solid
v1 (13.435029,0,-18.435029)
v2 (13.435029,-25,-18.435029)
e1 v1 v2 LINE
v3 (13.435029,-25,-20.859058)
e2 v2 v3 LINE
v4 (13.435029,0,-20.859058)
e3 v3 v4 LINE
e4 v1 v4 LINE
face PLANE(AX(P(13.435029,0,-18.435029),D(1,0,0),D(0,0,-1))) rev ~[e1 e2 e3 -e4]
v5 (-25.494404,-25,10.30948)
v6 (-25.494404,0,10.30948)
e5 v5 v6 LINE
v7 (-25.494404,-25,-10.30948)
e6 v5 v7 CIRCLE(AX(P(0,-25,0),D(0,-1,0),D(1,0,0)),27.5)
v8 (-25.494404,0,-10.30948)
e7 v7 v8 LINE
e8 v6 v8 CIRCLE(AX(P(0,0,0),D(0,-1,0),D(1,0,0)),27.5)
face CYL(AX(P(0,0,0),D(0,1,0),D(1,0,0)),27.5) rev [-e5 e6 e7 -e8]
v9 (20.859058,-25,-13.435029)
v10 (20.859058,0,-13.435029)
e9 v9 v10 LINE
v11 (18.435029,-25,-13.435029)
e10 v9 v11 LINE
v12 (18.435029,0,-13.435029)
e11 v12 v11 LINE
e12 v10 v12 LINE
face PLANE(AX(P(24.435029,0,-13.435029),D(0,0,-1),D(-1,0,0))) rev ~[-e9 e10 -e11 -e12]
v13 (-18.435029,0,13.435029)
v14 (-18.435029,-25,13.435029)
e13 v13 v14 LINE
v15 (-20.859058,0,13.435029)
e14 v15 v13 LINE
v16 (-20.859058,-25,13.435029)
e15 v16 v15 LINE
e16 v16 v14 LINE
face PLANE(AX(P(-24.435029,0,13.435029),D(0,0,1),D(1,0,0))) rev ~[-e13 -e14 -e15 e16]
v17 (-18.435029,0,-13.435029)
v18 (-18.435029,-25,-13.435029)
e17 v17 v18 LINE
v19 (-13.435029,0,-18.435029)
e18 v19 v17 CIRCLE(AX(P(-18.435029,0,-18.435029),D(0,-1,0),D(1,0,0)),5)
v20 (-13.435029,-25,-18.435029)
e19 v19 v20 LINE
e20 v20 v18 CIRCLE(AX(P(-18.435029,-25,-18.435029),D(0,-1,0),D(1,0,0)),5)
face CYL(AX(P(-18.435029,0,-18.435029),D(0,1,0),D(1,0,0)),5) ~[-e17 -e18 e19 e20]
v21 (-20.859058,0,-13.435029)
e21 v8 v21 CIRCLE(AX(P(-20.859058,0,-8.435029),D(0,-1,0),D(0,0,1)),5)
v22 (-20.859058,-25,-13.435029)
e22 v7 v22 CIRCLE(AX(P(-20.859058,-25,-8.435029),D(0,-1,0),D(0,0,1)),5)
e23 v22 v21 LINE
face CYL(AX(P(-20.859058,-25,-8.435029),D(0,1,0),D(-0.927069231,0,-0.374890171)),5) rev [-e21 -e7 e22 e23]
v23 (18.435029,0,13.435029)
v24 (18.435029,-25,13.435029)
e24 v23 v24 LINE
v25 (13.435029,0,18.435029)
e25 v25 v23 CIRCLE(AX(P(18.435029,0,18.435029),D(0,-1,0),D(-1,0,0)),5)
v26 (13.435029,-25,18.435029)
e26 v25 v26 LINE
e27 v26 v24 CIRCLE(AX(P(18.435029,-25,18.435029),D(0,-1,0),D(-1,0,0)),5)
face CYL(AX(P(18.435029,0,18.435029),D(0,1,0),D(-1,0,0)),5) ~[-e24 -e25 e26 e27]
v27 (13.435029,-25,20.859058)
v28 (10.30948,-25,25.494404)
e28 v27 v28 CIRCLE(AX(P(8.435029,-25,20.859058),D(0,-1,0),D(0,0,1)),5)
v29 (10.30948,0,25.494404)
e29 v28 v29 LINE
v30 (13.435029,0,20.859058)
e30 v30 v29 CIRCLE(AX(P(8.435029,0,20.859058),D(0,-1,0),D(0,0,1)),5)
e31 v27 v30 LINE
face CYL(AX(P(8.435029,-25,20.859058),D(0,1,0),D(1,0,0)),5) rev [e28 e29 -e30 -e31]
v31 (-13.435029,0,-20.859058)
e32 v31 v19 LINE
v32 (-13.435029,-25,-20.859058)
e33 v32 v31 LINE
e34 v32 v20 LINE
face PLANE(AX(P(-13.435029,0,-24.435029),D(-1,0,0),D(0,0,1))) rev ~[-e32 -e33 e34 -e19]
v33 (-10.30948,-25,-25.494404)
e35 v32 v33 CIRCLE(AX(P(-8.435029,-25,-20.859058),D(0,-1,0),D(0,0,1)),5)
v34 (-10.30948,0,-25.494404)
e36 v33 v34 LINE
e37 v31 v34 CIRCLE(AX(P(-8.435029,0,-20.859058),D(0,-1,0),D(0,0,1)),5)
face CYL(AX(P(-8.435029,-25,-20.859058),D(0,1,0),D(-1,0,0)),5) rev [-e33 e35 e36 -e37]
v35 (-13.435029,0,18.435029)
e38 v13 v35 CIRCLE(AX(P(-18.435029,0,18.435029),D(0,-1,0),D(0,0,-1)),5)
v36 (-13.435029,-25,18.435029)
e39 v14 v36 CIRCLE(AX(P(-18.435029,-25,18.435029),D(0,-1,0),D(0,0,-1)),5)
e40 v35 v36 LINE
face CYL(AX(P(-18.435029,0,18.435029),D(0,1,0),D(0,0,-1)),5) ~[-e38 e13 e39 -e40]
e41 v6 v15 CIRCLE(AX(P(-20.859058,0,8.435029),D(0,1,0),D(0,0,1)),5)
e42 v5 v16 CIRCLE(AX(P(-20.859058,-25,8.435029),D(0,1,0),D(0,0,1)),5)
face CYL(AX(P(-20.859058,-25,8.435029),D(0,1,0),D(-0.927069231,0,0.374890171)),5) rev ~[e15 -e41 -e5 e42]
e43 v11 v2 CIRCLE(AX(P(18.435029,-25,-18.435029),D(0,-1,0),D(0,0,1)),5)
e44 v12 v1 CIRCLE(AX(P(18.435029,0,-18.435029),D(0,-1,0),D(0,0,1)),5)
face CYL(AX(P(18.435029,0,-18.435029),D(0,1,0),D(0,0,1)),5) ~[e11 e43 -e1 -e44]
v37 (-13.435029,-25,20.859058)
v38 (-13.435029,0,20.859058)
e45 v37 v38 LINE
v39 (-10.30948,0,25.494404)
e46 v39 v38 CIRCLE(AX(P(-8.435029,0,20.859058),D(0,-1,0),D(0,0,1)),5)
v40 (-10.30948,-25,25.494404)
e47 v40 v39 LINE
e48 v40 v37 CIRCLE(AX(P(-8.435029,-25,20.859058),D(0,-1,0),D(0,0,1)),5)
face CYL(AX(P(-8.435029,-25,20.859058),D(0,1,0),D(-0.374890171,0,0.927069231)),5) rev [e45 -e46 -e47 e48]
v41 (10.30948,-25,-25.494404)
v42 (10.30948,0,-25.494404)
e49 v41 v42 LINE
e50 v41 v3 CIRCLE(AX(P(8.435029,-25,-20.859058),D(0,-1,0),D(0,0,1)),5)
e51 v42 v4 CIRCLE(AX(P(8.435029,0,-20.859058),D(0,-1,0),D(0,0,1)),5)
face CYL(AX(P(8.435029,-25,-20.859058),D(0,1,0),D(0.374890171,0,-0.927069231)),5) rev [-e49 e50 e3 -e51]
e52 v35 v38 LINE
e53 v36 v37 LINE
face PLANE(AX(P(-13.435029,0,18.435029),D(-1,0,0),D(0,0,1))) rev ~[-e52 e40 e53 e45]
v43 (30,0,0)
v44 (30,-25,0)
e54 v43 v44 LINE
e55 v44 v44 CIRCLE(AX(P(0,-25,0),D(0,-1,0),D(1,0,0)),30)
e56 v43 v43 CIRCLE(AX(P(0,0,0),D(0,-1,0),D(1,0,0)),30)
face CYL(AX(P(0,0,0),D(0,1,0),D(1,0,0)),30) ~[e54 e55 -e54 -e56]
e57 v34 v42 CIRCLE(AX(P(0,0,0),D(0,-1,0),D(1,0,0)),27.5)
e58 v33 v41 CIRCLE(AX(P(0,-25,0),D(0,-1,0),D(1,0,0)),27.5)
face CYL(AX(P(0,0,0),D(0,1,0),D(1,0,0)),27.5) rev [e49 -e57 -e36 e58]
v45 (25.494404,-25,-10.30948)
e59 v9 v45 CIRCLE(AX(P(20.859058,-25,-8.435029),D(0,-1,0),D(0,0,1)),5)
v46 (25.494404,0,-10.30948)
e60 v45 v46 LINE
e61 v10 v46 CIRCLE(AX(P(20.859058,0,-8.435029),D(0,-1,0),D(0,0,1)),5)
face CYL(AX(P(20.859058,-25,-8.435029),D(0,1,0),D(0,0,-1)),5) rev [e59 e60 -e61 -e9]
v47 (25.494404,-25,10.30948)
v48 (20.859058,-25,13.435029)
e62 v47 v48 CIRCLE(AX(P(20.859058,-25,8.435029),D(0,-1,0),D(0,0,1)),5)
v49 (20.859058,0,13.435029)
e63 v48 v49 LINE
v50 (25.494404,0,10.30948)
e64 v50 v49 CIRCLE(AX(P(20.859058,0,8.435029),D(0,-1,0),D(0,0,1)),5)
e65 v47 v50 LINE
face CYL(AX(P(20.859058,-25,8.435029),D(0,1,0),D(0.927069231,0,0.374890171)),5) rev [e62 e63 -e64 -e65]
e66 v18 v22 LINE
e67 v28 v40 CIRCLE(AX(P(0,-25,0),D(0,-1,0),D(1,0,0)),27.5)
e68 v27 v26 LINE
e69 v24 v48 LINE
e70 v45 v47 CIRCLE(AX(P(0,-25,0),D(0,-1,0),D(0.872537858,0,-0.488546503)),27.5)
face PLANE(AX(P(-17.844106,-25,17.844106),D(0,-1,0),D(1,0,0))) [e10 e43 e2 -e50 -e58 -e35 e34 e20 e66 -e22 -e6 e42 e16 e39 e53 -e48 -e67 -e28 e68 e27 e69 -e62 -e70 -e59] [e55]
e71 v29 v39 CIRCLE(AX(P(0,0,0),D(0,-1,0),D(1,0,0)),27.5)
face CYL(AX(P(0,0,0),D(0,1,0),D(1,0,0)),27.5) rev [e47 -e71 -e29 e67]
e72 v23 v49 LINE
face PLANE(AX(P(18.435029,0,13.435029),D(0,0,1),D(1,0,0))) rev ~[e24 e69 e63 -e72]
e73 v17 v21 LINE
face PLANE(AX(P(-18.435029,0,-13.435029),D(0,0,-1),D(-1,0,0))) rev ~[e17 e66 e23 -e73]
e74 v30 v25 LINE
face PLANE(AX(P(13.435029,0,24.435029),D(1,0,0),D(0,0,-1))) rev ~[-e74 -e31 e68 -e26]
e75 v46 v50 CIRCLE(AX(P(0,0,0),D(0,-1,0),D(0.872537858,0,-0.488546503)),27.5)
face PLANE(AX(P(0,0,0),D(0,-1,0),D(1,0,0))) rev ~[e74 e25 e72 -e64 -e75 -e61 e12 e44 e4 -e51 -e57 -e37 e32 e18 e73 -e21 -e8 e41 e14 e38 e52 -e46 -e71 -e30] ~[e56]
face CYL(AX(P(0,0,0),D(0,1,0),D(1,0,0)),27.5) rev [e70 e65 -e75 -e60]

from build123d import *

# Parameters (mm, degrees)
F0_R     = 30
F0_R_2   = 27.5
F1_DEPTH = 25
F3_DEPTH = 25
F4_R     = 5


with BuildPart() as f1:
    # F0 (on Front) → F1 (new body)
    with BuildSketch(Plane.XZ):
        Circle(F0_R)
        Circle(F0_R_2, mode=Mode.SUBTRACT)
    extrude(amount=F1_DEPTH)

    # F2 (on Front) → F3 (join)
    with BuildSketch(Plane.XZ):
        with BuildLine():
            Line((-24.4350288425, 13.4350288425), (-18.4350288425, 13.4350288425))
            ThreePointArc((-18.4350288425, 13.4350288425), (-14.8994949366, 14.8994949366), (-13.4350288425, 18.4350288425))
            Line((-13.4350288425, 18.4350288425), (-13.4350288425, 24.4350288425))
            ThreePointArc((-13.4350288425, 24.4350288425), (-19.7176397489, 19.7176397489), (-24.4350288425, 13.4350288425))
        make_face()
        with BuildLine():
            ThreePointArc((18.4350288425, -13.4350288425), (14.8994949366, -14.8994949366), (13.4350288425, -18.4350288425))
            Line((13.4350288425, -18.4350288425), (13.4350288425, -24.4350288425))
            ThreePointArc((13.4350288425, -24.4350288425), (19.7176397489, -19.7176397489), (24.4350288425, -13.4350288425))
            Line((24.4350288425, -13.4350288425), (18.4350288425, -13.4350288425))
        make_face()
        with BuildLine():
            ThreePointArc((13.4350288425, 18.4350288425), (14.8994949366, 14.8994949366), (18.4350288425, 13.4350288425))
            Line((18.4350288425, 13.4350288425), (24.4350288425, 13.4350288425))
            ThreePointArc((24.4350288425, 13.4350288425), (19.7176397489, 19.7176397489), (13.4350288425, 24.4350288425))
            Line((13.4350288425, 24.4350288425), (13.4350288425, 18.4350288425))
        make_face()
        with BuildLine():
            Line((-13.4350288425, -24.4350288425), (-13.4350288425, -18.4350288425))
            ThreePointArc((-13.4350288425, -18.4350288425), (-14.8994949366, -14.8994949366), (-18.4350288425, -13.4350288425))
            Line((-18.4350288425, -13.4350288425), (-24.4350288425, -13.4350288425))
            ThreePointArc((-24.4350288425, -13.4350288425), (-19.7176397489, -19.7176397489), (-13.4350288425, -24.4350288425))
        make_face()
    extrude(amount=F3_DEPTH)

    # F4
    f4_edges = [f1.edges().sort_by_distance(p)[0] for p in [
        (-13.435029, -12.5, 23.994791),
        (-23.994791, -12.5, 13.435029),
        (-23.994791, -12.5, -13.435029),
        (-13.435029, -12.5, -23.994791),
        (13.435029, -12.5, 23.994791),
        (23.994791, -12.5, 13.435029),
        (13.435029, -12.5, -23.994791),
        (23.994791, -12.5, -13.435029),
    ]]
    fillet(f4_edges, radius=F4_R)


solid = f1.part
